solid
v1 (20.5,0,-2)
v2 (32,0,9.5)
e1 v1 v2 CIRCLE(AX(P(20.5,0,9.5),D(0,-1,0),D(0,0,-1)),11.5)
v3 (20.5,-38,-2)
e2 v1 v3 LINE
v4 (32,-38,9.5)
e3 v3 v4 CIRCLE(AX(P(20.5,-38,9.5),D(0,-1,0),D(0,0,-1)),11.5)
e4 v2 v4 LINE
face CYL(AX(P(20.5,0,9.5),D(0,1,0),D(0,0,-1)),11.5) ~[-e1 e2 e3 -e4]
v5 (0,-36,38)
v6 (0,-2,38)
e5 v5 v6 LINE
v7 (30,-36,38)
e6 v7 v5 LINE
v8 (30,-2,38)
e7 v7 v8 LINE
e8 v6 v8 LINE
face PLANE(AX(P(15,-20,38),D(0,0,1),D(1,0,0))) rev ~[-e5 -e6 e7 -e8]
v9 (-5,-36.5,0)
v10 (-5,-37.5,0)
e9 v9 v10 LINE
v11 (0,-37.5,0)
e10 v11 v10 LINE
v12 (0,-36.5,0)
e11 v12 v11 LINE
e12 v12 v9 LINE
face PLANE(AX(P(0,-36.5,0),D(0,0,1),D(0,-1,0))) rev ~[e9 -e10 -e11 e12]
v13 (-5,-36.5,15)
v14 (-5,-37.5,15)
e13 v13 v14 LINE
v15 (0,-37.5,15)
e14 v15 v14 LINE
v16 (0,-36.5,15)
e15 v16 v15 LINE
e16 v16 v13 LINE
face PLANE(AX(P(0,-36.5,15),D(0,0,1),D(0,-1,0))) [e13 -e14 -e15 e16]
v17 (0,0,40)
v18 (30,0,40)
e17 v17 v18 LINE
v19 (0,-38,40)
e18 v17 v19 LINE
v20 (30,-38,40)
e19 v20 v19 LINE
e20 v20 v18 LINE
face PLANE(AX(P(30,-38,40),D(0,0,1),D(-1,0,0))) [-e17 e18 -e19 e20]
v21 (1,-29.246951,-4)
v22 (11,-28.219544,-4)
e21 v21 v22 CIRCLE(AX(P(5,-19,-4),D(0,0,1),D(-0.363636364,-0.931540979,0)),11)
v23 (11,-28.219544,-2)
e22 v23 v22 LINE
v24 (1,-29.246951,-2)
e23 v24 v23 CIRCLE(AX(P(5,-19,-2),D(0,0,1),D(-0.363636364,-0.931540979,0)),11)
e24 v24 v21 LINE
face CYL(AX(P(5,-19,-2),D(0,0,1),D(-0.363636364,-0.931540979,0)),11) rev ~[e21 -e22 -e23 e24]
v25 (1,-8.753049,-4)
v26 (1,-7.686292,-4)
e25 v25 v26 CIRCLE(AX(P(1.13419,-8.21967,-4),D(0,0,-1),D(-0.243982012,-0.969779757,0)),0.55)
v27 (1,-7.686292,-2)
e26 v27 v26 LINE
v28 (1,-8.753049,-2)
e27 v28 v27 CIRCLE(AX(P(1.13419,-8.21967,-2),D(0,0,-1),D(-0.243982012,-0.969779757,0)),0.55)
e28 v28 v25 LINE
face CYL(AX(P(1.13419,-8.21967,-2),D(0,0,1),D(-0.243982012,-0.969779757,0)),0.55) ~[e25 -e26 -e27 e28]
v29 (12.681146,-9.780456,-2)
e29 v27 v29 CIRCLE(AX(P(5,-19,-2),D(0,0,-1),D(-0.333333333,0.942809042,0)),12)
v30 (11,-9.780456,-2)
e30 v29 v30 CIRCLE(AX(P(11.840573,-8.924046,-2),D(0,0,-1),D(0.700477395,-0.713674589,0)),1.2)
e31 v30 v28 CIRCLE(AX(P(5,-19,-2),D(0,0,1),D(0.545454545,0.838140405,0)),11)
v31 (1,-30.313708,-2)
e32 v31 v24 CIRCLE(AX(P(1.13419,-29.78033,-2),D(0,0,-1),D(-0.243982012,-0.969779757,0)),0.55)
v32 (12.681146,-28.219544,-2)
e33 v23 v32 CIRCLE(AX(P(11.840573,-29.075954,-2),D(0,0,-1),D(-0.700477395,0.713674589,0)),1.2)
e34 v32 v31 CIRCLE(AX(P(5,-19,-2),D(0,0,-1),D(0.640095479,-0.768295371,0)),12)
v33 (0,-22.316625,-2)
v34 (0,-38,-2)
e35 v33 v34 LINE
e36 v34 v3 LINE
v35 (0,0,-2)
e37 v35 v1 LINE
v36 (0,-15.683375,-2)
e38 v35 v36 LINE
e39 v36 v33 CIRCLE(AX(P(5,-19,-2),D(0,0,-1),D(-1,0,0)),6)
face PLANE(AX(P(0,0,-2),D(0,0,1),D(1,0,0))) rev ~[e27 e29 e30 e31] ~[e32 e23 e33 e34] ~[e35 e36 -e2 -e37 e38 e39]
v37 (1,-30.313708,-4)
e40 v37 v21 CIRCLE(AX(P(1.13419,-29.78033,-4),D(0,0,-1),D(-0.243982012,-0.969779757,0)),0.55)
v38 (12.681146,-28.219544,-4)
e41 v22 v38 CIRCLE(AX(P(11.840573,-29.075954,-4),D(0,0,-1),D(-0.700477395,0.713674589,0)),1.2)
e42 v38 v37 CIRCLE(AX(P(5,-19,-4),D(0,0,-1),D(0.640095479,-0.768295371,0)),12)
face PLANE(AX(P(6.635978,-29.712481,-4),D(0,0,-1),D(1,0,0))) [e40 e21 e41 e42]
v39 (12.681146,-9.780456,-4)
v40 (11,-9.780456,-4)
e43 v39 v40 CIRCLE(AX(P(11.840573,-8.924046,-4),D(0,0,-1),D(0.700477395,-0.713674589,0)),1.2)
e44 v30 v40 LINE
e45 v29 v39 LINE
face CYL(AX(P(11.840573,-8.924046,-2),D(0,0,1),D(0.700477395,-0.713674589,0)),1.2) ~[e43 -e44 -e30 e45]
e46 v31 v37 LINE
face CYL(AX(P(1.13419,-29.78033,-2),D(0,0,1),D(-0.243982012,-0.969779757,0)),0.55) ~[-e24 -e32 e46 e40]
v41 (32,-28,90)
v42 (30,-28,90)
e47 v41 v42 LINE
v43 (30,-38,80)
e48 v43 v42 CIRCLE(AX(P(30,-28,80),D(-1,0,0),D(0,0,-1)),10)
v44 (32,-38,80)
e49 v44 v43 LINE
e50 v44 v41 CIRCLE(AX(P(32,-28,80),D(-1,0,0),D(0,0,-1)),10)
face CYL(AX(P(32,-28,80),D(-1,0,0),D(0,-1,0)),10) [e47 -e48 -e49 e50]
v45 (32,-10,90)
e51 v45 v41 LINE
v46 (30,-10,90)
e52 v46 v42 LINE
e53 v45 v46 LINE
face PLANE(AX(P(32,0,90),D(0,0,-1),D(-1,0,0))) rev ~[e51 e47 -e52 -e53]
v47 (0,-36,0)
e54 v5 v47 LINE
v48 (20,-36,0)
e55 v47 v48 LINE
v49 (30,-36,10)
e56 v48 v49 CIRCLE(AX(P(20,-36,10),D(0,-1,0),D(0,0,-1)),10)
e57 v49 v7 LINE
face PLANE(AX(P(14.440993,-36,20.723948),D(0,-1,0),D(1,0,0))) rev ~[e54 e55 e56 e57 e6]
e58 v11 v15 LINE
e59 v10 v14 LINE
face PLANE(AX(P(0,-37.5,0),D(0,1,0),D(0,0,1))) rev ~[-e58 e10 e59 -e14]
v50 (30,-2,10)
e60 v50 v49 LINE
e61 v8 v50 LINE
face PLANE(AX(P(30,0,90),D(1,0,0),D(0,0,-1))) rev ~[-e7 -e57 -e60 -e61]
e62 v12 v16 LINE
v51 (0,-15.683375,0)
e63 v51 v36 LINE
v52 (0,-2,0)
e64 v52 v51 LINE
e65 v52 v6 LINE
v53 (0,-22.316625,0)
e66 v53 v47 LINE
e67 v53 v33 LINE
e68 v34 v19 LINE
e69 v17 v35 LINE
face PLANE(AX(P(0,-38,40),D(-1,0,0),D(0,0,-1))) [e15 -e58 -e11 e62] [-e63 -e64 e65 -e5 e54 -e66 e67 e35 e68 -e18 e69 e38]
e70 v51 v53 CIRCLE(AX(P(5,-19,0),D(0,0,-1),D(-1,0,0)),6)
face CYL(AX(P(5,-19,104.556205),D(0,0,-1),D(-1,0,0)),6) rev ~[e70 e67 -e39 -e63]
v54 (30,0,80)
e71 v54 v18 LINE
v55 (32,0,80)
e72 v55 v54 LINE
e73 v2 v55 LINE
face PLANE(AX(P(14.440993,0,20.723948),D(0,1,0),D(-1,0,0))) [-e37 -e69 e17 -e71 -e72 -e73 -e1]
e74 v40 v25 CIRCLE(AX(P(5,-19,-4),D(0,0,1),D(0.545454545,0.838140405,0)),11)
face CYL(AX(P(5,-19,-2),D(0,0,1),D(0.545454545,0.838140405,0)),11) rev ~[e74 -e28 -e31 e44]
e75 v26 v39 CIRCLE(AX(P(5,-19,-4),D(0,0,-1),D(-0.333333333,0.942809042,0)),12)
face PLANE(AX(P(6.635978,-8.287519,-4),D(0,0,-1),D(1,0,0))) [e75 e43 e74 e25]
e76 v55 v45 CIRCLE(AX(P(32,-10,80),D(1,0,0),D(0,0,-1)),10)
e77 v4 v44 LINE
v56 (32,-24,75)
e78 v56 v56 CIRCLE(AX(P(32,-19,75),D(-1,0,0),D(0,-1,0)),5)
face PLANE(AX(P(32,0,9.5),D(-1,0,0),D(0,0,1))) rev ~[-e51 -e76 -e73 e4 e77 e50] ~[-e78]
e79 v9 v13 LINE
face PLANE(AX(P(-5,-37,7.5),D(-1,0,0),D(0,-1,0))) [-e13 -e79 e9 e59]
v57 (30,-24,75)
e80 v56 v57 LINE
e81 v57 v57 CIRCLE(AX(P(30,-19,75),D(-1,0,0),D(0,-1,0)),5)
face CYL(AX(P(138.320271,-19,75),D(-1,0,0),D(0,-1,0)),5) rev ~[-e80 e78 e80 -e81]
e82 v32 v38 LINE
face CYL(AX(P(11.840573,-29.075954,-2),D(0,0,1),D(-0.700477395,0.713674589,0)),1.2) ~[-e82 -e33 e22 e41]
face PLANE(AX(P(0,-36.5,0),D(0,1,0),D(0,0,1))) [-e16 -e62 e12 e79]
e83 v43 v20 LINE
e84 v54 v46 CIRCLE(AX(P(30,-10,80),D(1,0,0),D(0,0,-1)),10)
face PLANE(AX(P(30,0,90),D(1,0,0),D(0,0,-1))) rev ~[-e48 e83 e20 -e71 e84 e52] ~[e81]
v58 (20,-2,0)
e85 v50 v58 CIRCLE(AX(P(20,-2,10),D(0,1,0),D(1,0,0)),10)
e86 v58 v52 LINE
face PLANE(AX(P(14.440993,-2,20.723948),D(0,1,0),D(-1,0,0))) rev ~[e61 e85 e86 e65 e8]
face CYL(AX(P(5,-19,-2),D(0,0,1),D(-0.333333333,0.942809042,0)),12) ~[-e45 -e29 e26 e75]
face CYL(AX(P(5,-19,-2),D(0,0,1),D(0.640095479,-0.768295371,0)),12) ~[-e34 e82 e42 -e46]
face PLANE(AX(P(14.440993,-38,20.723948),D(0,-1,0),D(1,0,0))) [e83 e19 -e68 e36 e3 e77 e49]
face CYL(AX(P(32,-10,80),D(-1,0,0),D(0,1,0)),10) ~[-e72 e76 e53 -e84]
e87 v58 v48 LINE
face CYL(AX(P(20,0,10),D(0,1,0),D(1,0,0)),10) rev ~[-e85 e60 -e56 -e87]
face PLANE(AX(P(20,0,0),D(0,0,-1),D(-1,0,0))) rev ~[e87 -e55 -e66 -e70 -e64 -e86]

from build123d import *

# Parameters (mm, degrees)
F1_DEPTH  = 38
F3_D      = 12
F5_DEPTH  = 2
F6_R      = 10
F8_D      = 10
F10_DEPTH = 2
F12_DEPTH = 2
F14_W     = 30
F14_H     = 36
F15_DEPTH = 2
F16_W     = 1
F16_H     = 15
F17_DEPTH = 5


# Not quite as in the source:
# - a feature names something its author has since deleted; it is built from what else it names


with BuildPart() as f1:
    # F0 (on Front) → F1 (new body)
    with BuildSketch(Plane.XZ):
        with BuildLine():
            Line((20, 0), (0, 0))
            Line((0, 0), (0, -2))
            Line((0, -2), (20.5, -2))
            ThreePointArc((20.5, -2), (28.6317279836, 1.3682720164), (32, 9.5))
            Line((32, 9.5), (32, 90))
            Line((32, 90), (30, 90))
            Line((30, 90), (30, 10))
            ThreePointArc((30, 10), (27.0710678119, 2.9289321881), (20, 0))
        make_face()
    extrude(amount=F1_DEPTH)

    # F3 (through all)
    with Locations(Plane.XY):
        with Locations((5, -19)):
            Hole(F3_D / 2)

    # F4 (on face) → F5 (join)
    with BuildSketch(Plane(origin=(0, 0, -2), x_dir=(1, 0, 0), z_dir=(0, 0, -1))):
        with BuildLine():
            ThreePointArc((1, 29.246950766), (6.1242290384, 29.9423996029), (11, 28.2195444573))
            ThreePointArc((11, 28.2195444573), (11.8405728739, 27.8759539642), (12.6811457479, 28.2195444573))
            ThreePointArc((12.6811457479, 28.2195444573), (7.117566826, 30.811685347), (1, 30.313708499))
            ThreePointArc((1, 30.313708499), (0.5841901068, 29.7803296325), (1, 29.246950766))
        make_face()
        with BuildLine():
            ThreePointArc((11, 9.7804555427), (6.1242290384, 8.0576003971), (1, 8.753049234))
            ThreePointArc((1, 8.753049234), (0.5841901068, 8.2196703675), (1, 7.686291501))
            ThreePointArc((1, 7.686291501), (7.117566826, 7.188314653), (12.6811457479, 9.7804555427))
            ThreePointArc((12.6811457479, 9.7804555427), (11.8405728739, 10.1240460358), (11, 9.7804555427))
        make_face()
    extrude(amount=F5_DEPTH)

    # F6
    f6_edges = [f1.edges().sort_by_distance(p)[0] for p in [
        (31, -38, 90),
        (31, 0, 90),
    ]]
    fillet(f6_edges, radius=F6_R)

    # F8 (through all)
    with Locations(Plane.YZ.offset(32)):
        with Locations((-19, 75)):
            Hole(F8_D / 2)


with BuildPart() as f10:
    # F9 (on face) → F10 (new body)
    with BuildSketch(Plane.XZ.offset(38)):
        with BuildLine():
            Line((0, 40), (0, 0))
            Line((0, 0), (20, 0))
            ThreePointArc((20, 0), (27.0710678119, 2.9289321881), (30, 10))
            Line((30, 10), (30, 40))
            Line((30, 40), (0, 40))
        make_face()
    extrude(amount=-F10_DEPTH)


with BuildPart() as f12:
    # F11 (on face) → F12 (new body)
    with BuildSketch(Plane(origin=(0, 0, 0), x_dir=(-1, 0, 0), z_dir=(0, 1, 0))):
        with BuildLine():
            Line((-20, 0), (0, 0))
            Line((0, 0), (0, 40))
            Line((0, 40), (-30, 40))
            Line((-30, 40), (-30, 10))
            ThreePointArc((-30, 10), (-27.0710678119, 2.9289321881), (-20, 0))
        make_face()
    extrude(amount=-F12_DEPTH)


with BuildPart() as f1_1:
    add(f1.part)

    # F13: union F10, F12
    add(f10.part)
    add(f12.part)

    # F14 (on face) → F15 (join)
    with BuildSketch(Plane.XY.offset(40)):
        with Locations((15, -20)):
            Rectangle(F14_W, F14_H)
    extrude(amount=-F15_DEPTH)

    # F16 (on face) → F17 (join)
    with BuildSketch(Plane(origin=(0, 0, 0), x_dir=(0, -1, 0), z_dir=(-1, 0, 0))):
        with Locations((37, 7.5)):
            Rectangle(F16_W, F16_H)
    extrude(amount=F17_DEPTH)


solid = f1_1.part
